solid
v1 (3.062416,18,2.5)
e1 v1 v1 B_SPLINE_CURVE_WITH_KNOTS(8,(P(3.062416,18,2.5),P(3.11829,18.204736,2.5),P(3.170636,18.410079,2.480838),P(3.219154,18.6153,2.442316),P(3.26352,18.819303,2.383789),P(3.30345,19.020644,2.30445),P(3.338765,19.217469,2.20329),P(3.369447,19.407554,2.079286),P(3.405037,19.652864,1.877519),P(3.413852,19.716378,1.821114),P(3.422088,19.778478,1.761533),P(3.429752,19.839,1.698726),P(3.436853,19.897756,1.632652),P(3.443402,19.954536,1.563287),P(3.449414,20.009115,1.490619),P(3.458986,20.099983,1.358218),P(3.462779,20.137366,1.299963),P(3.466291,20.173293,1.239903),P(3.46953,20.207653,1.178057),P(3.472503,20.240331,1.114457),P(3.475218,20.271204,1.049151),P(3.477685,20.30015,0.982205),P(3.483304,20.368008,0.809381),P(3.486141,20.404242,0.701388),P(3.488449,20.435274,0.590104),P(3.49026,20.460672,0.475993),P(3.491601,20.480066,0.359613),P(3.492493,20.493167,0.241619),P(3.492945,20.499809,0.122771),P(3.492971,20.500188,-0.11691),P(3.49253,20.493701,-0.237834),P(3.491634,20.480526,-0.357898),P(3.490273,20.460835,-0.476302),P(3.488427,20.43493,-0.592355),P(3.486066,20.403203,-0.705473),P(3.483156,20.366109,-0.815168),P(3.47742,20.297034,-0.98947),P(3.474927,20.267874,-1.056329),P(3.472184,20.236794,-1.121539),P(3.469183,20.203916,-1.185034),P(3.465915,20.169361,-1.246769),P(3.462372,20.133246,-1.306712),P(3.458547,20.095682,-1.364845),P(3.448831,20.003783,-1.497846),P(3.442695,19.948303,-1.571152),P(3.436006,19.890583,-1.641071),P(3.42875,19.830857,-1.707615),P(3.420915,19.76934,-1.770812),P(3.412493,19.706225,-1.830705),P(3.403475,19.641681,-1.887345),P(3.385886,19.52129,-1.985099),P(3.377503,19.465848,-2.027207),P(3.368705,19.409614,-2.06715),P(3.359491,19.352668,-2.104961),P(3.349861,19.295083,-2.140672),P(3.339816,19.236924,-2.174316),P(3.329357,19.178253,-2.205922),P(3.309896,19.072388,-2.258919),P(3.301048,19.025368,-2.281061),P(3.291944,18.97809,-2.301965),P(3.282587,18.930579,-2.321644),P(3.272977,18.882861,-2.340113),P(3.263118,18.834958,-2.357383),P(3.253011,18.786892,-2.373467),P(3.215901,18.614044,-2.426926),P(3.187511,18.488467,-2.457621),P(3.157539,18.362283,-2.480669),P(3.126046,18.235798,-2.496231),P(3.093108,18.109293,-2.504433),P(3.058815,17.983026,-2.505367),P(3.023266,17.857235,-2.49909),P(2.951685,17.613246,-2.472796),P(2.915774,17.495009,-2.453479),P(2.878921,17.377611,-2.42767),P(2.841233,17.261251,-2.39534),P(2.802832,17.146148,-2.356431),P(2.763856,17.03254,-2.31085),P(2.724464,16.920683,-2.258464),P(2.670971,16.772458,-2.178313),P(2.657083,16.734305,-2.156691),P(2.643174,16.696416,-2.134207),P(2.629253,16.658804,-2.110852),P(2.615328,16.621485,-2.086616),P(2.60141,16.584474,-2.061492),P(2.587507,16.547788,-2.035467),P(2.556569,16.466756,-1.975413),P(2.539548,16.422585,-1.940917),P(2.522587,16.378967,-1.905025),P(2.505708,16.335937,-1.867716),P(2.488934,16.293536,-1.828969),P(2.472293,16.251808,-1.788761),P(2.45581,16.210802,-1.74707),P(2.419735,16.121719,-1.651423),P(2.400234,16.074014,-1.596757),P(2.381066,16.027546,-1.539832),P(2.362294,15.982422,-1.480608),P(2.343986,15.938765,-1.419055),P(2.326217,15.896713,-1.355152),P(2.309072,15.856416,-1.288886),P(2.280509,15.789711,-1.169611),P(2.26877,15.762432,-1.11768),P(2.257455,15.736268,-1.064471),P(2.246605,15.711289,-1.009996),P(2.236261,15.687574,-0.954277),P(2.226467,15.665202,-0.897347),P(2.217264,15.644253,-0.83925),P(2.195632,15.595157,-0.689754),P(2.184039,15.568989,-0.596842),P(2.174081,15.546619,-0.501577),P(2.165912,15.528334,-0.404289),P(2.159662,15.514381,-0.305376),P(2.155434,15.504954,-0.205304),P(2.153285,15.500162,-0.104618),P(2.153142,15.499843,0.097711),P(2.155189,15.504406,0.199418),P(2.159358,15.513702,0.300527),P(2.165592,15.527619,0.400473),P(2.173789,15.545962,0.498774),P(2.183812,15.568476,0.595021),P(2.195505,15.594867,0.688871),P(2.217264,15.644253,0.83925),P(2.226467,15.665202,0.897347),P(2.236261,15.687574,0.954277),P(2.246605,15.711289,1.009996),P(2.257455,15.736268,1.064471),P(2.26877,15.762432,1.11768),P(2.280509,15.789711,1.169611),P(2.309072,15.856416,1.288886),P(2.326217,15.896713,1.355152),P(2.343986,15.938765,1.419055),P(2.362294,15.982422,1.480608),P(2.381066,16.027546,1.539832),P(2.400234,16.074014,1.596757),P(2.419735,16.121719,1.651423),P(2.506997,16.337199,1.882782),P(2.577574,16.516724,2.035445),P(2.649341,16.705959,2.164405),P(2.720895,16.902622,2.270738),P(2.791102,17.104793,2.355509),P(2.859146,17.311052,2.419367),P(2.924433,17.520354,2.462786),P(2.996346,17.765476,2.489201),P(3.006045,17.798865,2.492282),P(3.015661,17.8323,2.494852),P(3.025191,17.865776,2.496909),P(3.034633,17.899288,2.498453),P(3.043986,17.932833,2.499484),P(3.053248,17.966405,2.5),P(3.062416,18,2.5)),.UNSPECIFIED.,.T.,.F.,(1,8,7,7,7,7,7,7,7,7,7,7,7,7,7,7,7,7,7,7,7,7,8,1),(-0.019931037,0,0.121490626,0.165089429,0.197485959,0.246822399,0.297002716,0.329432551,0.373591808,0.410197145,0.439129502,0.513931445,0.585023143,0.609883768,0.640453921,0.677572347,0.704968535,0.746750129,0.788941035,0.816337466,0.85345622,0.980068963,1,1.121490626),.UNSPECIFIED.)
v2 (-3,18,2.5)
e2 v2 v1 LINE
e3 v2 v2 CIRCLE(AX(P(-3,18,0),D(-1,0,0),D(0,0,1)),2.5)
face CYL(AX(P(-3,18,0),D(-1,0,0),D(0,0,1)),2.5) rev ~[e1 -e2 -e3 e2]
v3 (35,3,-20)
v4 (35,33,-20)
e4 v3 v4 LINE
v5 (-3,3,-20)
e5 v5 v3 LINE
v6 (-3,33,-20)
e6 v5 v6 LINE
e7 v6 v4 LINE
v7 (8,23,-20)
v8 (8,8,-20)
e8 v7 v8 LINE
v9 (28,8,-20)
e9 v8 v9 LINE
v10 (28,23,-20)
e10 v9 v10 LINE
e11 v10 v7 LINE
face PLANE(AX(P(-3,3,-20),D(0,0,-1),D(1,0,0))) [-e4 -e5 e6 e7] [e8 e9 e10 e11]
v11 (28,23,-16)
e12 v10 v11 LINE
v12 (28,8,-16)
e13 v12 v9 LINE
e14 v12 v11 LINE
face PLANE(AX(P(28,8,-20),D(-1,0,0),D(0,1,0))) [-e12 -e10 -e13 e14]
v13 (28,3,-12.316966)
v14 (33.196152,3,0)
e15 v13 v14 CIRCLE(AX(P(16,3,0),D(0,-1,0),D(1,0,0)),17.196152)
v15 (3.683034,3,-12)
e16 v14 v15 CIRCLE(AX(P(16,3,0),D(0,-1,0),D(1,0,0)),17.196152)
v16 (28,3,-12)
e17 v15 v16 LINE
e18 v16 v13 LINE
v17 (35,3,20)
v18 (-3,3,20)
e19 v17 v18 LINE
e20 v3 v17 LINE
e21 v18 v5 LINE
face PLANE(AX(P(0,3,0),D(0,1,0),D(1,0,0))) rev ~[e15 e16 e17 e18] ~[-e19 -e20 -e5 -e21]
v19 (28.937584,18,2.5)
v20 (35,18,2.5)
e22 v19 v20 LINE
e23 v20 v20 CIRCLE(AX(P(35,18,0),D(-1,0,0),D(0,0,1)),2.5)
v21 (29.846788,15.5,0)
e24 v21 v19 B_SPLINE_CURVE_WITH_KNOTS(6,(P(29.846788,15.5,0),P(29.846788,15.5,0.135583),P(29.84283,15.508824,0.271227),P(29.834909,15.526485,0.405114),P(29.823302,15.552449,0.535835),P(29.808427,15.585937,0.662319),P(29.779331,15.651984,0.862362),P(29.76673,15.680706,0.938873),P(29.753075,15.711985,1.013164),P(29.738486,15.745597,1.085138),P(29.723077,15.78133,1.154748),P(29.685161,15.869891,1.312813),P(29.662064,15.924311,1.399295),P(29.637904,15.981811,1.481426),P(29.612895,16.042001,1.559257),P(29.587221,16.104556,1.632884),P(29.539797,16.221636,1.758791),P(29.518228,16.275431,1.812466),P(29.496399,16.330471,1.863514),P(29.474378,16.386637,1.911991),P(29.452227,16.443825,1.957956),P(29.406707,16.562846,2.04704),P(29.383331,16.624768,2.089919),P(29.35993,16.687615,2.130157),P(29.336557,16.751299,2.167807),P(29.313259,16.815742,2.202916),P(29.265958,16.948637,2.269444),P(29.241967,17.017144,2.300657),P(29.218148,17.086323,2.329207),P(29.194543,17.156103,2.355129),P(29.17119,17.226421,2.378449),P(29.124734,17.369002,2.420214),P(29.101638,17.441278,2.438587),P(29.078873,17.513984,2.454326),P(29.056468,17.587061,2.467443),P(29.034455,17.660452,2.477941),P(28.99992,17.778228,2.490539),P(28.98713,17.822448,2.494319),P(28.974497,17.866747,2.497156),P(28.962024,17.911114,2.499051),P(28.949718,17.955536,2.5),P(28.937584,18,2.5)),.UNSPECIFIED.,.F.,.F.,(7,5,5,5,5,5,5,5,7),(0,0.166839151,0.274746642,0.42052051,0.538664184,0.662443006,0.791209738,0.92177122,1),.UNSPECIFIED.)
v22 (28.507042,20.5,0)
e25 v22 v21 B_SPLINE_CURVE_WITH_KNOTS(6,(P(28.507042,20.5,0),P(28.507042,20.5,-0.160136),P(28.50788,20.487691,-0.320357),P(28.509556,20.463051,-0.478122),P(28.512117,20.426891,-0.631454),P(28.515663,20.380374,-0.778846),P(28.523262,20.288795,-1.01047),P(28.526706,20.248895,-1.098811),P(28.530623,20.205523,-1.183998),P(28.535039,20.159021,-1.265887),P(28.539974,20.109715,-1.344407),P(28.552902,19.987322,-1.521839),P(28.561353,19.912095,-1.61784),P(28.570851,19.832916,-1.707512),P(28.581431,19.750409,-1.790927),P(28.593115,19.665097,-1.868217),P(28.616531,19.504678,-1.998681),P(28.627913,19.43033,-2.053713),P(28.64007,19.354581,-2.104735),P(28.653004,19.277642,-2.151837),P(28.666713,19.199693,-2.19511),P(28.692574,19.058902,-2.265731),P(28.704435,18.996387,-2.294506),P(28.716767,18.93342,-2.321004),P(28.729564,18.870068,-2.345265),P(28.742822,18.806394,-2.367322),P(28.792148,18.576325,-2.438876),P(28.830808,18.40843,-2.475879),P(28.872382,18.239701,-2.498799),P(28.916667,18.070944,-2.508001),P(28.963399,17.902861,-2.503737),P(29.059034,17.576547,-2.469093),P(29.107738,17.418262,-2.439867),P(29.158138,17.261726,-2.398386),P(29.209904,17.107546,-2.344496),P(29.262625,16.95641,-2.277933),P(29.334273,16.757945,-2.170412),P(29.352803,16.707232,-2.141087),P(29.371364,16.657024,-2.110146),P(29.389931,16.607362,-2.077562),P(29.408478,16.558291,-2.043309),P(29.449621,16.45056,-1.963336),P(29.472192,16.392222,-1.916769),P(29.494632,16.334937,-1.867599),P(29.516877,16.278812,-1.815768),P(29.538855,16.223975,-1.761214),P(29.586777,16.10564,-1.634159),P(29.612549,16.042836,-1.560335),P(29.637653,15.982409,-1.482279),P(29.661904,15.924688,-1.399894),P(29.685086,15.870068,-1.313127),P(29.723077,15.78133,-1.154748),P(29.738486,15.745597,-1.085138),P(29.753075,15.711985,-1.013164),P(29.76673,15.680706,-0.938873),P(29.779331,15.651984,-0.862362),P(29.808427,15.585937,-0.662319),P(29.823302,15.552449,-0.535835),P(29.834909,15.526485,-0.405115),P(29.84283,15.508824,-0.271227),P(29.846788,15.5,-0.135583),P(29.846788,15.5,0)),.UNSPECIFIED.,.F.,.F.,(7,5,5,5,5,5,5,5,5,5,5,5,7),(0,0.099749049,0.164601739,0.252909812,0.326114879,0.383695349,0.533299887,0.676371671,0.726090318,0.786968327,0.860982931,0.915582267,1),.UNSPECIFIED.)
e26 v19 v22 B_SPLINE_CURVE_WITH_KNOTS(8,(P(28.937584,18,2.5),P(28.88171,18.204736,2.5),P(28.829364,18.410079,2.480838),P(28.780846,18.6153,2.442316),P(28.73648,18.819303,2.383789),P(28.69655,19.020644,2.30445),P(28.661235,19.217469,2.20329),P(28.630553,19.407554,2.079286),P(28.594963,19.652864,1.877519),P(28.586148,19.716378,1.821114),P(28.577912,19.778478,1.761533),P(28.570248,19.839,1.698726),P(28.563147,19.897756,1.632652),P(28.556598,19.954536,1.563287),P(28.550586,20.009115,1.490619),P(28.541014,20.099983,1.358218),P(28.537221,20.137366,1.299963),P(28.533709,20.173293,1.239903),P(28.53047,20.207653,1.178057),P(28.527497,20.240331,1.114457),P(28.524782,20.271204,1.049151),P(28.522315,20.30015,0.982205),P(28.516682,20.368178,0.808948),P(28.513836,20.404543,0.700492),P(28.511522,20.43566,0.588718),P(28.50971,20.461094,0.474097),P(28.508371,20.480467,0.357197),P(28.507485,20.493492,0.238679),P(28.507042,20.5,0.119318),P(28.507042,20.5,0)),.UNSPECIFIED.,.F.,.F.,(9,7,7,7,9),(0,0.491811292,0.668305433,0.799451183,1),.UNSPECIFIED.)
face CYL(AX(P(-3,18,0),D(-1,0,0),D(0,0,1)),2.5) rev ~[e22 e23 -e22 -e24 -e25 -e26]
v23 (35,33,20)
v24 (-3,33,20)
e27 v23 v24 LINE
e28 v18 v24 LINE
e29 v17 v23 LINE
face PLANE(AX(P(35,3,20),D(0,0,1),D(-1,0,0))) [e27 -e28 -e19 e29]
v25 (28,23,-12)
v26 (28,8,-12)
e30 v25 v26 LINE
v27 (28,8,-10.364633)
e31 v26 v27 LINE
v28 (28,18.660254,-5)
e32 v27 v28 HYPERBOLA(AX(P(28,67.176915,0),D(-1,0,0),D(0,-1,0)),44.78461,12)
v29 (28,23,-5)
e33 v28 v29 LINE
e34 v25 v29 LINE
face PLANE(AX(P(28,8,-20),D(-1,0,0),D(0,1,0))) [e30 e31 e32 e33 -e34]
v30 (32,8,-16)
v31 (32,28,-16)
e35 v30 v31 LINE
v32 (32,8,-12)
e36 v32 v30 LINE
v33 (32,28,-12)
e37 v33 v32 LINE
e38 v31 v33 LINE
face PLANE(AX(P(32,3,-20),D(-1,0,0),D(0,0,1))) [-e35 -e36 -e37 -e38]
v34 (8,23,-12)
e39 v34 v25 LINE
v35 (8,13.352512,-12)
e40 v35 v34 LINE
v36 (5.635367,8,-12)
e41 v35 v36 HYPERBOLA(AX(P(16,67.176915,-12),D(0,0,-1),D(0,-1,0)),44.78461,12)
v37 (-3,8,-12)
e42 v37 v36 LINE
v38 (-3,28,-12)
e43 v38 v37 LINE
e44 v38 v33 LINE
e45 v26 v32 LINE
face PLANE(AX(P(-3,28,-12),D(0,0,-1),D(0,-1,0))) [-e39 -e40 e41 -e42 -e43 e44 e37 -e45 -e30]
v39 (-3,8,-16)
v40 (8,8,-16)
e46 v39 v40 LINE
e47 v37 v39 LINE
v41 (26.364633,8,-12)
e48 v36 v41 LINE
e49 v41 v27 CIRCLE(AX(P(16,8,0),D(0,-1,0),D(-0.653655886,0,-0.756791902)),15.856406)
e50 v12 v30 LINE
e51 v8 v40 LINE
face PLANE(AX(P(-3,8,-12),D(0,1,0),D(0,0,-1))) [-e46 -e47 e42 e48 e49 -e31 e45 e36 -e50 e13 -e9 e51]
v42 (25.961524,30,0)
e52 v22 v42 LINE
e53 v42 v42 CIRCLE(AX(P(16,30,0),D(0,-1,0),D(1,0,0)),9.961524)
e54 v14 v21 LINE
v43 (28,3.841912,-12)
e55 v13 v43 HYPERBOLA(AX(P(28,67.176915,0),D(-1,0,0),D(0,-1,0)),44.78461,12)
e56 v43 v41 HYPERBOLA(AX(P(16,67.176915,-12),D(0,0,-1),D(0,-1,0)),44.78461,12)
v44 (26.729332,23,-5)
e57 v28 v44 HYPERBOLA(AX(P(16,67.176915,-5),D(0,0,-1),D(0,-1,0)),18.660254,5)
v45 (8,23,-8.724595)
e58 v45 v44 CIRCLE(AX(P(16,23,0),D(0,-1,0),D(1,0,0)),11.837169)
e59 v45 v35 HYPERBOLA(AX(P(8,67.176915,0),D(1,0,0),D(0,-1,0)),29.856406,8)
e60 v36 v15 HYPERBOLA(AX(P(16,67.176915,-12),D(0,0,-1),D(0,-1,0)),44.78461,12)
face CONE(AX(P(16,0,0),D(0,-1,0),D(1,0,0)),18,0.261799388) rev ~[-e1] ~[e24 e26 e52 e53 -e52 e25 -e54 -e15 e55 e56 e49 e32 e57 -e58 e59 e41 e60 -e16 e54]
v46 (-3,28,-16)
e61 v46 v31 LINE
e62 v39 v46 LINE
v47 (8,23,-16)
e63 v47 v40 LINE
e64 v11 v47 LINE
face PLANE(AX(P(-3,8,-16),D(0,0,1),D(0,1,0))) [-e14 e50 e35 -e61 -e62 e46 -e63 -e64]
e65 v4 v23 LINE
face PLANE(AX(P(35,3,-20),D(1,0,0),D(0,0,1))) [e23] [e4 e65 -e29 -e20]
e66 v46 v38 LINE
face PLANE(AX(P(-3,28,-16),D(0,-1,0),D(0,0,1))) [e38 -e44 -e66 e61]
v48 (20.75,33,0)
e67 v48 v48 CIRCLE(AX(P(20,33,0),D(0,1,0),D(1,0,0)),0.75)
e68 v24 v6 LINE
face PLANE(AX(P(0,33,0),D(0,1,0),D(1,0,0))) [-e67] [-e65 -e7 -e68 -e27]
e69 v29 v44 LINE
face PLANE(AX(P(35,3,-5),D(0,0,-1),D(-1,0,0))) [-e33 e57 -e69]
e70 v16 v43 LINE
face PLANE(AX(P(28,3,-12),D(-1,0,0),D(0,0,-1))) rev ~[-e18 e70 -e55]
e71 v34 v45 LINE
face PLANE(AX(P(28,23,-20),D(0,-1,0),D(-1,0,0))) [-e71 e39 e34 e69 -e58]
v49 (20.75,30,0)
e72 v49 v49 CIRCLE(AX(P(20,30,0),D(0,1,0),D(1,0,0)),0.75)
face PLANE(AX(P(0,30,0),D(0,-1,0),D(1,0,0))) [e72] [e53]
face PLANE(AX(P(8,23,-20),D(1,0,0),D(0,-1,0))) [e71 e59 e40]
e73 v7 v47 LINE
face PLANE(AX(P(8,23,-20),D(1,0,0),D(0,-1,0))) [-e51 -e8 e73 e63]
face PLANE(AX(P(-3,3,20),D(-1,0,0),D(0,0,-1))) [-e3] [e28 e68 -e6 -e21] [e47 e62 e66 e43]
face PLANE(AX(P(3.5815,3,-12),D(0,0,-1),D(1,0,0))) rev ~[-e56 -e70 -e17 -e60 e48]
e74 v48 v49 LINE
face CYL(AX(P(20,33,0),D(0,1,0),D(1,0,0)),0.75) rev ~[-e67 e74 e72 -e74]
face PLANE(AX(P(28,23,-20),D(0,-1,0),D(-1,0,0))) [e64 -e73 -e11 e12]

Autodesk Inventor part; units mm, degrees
ref_plane "YZ Plane" through (0, 0, 0) normal (1, 0, 0) x (0, 1, 0)
ref_plane "XZ Plane" through (0, 0, 0) normal (0, 1, 0) x (-1, 0, 0)
ref_plane "XY Plane" through (0, 0, 0) normal (0, 0, 1) x (1, 0, 0)
ref_plane "Work Plane13" through (0, 3, 0) normal (0, 1, 0) x (1, 0, 0)
sketch "Sketch45" plane through (0, 3, 0) normal (0, 1, 0) x (1, 0, 0)
  line L0 (35, -20) -> (-3, -20)
  line L1 (-3, -20) -> (-3, 20)
  line L2 (-3, 20) -> (35, 20)
  line L3 (35, 20) -> (35, -20)
  point P0 (0, 0)
  dimension "d142" = 38
  dimension "d143" = 40
extrude "Extrusion34" add sketch "Sketch45" along normal blind 30
sketch "Sketch46" plane through (0, 33, 0) normal (0, 1, 0) x (1, 0, 0)
  point P0 (0, 0)
ref_plane "Work Plane11" through (0, 0, 0) normal (0, -1, 0) x (1, 0, 0)
sketch "Sketch47" plane through (0, 0, 0) normal (0, -1, 0) x (1, 0, 0)
  circle A0 centre (16, 0) radius 18
  point P0 (0, 0)
  dimension "d146" = 36
extrude "Extrusion35" cut sketch "Sketch47" against normal blind 30 draft -15
sketch "Sketch48" plane through (0, 33, 0) normal (0, 1, 0) x (1, 0, 0)
  point P0 (0, 0)
sketch "Sketch49" plane through (0, 33, 0) normal (0, 1, 0) x (1, 0, 0)
  circle A0 centre (20, 0) radius 0.75
  point P0 (0, 0)
  dimension "d149" = 1.5
extrude "Extrusion36" cut sketch "Sketch49" against normal through all
ref_plane "Work Plane7" through (35, 3, -20) normal (0, 0, -1) x (-1, 0, 0)
sketch "Sketch58" plane through (35, 3, -20) normal (0, 0, -1) x (-1, 0, 0)
  line L0 (7, 20) -> (27, 20)
  line L1 (27, 20) -> (27, 5)
  line L2 (27, 5) -> (7, 5)
  line L3 (7, 5) -> (7, 20)
  point P0 (35, -3)
  dimension "d156" = 20
  dimension "d157" = 15
extrude "Extrusion38" cut sketch "Sketch58" against normal blind 15
ref_plane "Work Plane4" through (-3, 3, -20) normal (-1, 0, 0) x (0, 0, 1)
sketch "Sketch59" plane through (-3, 3, -20) normal (-1, 0, 0) x (0, 0, 1)
  line L0 (4, 25) -> (8, 25)
  line L1 (8, 25) -> (8, 5)
  line L2 (8, 5) -> (4, 5)
  line L3 (4, 5) -> (4, 25)
  point P0 (20, -3)
  dimension "d160" = 4
  dimension "d161" = 20
extrude "Extrusion39" cut sketch "Sketch59" against normal blind 35
ref_plane "Work Plane1" through (0, 3, 0) normal (0, 1, 0) x (1, 0, 0)
ref_plane "Work Plane6" through (0, 23, 0) normal (0, 1, 0) x (1, 0, 0)
sketch "Sketch62" plane through (-3, 3, -20) normal (-1, 0, 0) x (0, 0, 1)
  circle A0 centre (20, 15) radius 2.5
  point P0 (20, -3)
  dimension "d172" = 5
extrude "Extrusion42" cut sketch "Sketch62" against normal through all
sketch "Sketch65" plane through (0, 3, 0) normal (0, -1, 0) x (1, 0, 0)
  line L0 (-3, -12) -> (32, -12) projected
  line L1 (28, -20) -> (28, -16) projected
  line L2 (3.5815, -12) -> (28, -12)
  line L3 (28, -12) -> (28, -17.2375)
  line L4 (28, -17.2375) -> (3.5815, -17.2375)
  line L5 (3.5815, -17.2375) -> (3.5815, -12)
  point P0 (0, 0)
extrude "Extrusion44" add sketch "Sketch65" against normal blind 5
properties part number "liquid port_only_v03"
